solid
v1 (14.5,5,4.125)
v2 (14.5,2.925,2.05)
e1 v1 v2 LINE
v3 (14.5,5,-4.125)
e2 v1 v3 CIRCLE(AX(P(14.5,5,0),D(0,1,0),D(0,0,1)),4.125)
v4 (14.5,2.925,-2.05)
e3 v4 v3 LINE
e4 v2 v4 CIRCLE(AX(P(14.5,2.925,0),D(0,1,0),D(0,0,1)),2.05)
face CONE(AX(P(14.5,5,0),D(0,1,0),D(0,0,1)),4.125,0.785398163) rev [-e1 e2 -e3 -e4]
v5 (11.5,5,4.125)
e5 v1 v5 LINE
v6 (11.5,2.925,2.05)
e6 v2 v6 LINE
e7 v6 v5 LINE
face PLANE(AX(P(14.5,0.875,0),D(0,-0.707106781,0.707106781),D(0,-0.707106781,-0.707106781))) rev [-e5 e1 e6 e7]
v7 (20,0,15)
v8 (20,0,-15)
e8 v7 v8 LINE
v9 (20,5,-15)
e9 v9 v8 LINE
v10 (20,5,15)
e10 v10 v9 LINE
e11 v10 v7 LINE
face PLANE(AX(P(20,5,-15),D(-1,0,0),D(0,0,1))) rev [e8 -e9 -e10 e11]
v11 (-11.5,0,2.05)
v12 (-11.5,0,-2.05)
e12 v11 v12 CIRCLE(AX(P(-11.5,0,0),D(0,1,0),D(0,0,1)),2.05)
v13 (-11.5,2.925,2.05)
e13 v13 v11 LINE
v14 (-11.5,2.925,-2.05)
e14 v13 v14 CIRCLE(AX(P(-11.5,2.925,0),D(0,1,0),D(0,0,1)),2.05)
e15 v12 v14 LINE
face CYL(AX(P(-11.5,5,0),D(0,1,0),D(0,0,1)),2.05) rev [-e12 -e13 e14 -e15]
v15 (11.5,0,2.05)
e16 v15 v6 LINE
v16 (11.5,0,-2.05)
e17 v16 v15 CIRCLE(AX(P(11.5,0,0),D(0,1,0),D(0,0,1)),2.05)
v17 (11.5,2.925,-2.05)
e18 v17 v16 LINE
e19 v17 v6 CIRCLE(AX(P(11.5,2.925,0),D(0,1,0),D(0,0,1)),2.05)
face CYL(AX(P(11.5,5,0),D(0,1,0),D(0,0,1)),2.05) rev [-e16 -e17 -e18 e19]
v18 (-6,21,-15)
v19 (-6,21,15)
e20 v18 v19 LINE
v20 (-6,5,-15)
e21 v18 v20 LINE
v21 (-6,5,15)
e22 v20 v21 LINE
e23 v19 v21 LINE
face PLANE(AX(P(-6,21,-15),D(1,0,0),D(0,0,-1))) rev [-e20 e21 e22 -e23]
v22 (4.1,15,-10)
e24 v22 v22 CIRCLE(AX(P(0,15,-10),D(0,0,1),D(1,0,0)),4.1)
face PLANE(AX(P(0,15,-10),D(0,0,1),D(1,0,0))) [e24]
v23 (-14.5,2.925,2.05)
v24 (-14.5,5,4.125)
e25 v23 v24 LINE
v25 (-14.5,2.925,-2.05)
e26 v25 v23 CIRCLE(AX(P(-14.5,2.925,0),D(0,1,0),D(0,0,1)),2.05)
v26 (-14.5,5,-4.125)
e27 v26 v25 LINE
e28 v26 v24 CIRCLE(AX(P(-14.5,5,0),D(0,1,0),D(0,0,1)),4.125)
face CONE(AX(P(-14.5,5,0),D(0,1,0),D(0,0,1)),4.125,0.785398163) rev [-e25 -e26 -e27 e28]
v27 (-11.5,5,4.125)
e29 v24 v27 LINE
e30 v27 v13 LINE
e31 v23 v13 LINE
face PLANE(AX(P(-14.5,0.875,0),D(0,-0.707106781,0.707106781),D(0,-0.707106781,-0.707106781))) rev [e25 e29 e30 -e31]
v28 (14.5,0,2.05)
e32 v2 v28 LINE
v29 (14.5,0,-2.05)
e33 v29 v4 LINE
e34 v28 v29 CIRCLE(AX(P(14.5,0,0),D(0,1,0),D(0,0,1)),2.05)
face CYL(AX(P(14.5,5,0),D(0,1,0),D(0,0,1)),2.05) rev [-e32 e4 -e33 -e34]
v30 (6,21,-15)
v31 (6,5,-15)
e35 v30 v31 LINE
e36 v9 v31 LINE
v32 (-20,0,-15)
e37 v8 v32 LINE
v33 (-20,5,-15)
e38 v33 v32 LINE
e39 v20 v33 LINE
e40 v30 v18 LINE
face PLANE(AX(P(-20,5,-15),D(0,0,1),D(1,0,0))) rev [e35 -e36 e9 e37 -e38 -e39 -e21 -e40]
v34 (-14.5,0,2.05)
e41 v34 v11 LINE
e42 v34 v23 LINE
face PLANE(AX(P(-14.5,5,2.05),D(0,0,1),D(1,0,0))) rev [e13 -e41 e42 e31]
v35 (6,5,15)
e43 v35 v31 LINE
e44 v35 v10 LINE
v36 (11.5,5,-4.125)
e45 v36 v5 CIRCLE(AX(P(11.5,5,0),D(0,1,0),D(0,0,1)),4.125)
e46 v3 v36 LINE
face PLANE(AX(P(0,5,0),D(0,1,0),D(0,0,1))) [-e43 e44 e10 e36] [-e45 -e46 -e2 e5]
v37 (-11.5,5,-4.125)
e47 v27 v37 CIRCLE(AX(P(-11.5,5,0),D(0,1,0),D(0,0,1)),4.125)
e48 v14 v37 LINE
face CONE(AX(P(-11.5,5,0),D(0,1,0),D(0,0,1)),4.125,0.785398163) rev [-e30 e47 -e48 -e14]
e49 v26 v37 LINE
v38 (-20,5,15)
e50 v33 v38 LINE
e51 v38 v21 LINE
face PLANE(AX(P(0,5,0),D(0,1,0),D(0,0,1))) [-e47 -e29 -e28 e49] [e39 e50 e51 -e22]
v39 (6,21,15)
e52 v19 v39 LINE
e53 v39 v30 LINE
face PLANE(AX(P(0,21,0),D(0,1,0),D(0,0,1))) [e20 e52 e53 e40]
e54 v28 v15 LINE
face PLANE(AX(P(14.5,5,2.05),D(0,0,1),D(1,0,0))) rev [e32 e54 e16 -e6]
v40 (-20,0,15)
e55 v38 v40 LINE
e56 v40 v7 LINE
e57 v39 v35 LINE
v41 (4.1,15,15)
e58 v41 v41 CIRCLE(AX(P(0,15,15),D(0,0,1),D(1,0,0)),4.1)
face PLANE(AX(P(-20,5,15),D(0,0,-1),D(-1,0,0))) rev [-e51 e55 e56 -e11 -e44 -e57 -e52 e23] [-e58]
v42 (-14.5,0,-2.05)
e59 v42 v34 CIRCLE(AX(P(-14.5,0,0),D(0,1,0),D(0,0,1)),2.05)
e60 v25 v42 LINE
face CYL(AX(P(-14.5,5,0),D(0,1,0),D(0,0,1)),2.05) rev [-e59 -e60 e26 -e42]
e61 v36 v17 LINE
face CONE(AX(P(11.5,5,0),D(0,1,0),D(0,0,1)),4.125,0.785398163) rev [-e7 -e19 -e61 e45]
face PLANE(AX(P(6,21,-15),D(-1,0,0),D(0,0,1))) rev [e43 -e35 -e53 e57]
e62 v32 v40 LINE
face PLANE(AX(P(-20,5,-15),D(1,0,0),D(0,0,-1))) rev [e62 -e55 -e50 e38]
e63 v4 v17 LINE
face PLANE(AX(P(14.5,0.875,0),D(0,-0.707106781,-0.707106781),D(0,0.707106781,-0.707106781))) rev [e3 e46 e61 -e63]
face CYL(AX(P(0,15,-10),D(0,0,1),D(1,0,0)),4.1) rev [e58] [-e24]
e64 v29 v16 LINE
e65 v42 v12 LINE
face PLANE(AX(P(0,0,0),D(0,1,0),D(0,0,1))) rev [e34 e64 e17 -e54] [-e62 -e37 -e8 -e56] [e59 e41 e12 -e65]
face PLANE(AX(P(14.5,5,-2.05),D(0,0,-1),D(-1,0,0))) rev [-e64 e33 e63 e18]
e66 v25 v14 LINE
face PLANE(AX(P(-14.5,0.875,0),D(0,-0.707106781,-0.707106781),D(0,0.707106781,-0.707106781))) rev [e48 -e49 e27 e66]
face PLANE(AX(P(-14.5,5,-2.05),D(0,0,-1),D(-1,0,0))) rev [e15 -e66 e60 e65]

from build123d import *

# Parameters (mm, degrees)
SKIZZE1_W                                      = 40
SKIZZE1_H                                      = 30
AUFSATZ_LINEAR_AUSTRAGEN1_DEPTH                = 5
SKIZZE3_W                                      = 12
SKIZZE3_H                                      = 30
AUFSATZ_LINEAR_AUSTRAGEN2_DEPTH                = 16
SKIZZE4_R                                      = 4.1
SCHNITT_LINEAR_AUSTRAGEN1_DEPTH                = 25
FORMSENKUNG_LANGLOCH_F_R_M3_SENKSCHRAUBE_DEPTH = 5


with BuildPart() as part:
    # Skizze1 → Aufsatz-Linear austragen1 (new body)
    with BuildSketch(Plane(origin=(0, 0, 0), x_dir=(1, 0, 0), z_dir=(0, 1, 0))):
        Rectangle(SKIZZE1_W, SKIZZE1_H)
    extrude(amount=AUFSATZ_LINEAR_AUSTRAGEN1_DEPTH)

    # Skizze3 → Aufsatz-Linear austragen2 (add)
    with BuildSketch(Plane(origin=(0, 5, 0), x_dir=(1, 0, 0), z_dir=(0, 1, 0))):
        Rectangle(SKIZZE3_W, SKIZZE3_H)
    extrude(amount=AUFSATZ_LINEAR_AUSTRAGEN2_DEPTH)

    # Skizze4 → Schnitt-Linear austragen1 (cut)
    with BuildSketch(Plane.XY.offset(15)):
        with Locations((0, 15)):
            Circle(SKIZZE4_R)
    extrude(amount=-SCHNITT_LINEAR_AUSTRAGEN1_DEPTH, mode=Mode.SUBTRACT)

    # Formsenkung Langloch für M3 Senkschraube mit Schlitz/Kreuzschlitz1: read off the stored shape, not the designer's step
    # Formsenkung Langloch f_r M3 Senkschr 2 → Formsenkung Langloch für M3 Senkschraube mit Schlitz/Kreuzschlitz1 (cut)
    with BuildSketch(Plane(origin=(0, 0, 0), x_dir=(1, 0, 0), z_dir=(0, 1, 0))):
        with BuildLine():
            Line((-14.5, -2.05), (-11.5, -2.05))
            ThreePointArc((-11.5, -2.05), (-9.45, 0), (-11.5, 2.05))
            Line((-11.5, 2.05), (-14.5, 2.05))
            ThreePointArc((-14.5, 2.05), (-16.55, 0), (-14.5, -2.05))
        make_face()
    formsenkung_langloch_f_r_m3_senkschraube = extrude(amount=FORMSENKUNG_LANGLOCH_F_R_M3_SENKSCHRAUBE_DEPTH, mode=Mode.SUBTRACT)

    # Formsenkung Langloch f_r M3 Senkschr 3: loft between two sections, ruled curve by curve
    formsenkung_langloch_f_r_m3_senkschr_3_from = [
        Edge.make_three_point_arc((-11.5, 2.925, 2.05), (-10.050431099, 2.925, 1.449568901), (-9.45, 2.925, 0)),
        Edge.make_three_point_arc((-9.45, 2.925, 0), (-10.050431099, 2.925, -1.449568901), (-11.5, 2.925, -2.05)),
        Edge.make_three_point_arc((-14.5, 2.925, -2.05), (-15.949568901, 2.925, -1.449568901), (-16.55, 2.925, 0)),
        Edge.make_three_point_arc((-16.55, 2.925, 0), (-15.949568901, 2.925, 1.449568901), (-14.5, 2.925, 2.05)),
        Edge.make_line((-11.5, 2.925, -2.05), (-14.5, 2.925, -2.05)),
        Edge.make_line((-11.5, 2.925, 2.05), (-14.5, 2.925, 2.05)),
    ]
    formsenkung_langloch_f_r_m3_senkschr_3_to = [
        Edge.make_three_point_arc((-11.5, 5, 4.125), (-8.583184528, 5, 2.916815472), (-7.375, 5, 0)),
        Edge.make_three_point_arc((-7.375, 5, 0), (-8.583184528, 5, -2.916815472), (-11.5, 5, -4.125)),
        Edge.make_three_point_arc((-14.5, 5, -4.125), (-17.416815472, 5, -2.916815472), (-18.625, 5, 0)),
        Edge.make_three_point_arc((-18.625, 5, 0), (-17.416815472, 5, 2.916815472), (-14.5, 5, 4.125)),
        Edge.make_line((-11.5, 5, -4.125), (-14.5, 5, -4.125)),
        Edge.make_line((-11.5, 5, 4.125), (-14.5, 5, 4.125)),
    ]
    formsenkung_langloch_f_r_m3_senkschr_3 = Solid(Shell([*[Face.make_surface_from_curves(formsenkung_langloch_f_r_m3_senkschr_3_from[k], formsenkung_langloch_f_r_m3_senkschr_3_to[k]) for k in range(6)], Face(Wire(formsenkung_langloch_f_r_m3_senkschr_3_from)), Face(Wire(formsenkung_langloch_f_r_m3_senkschr_3_to))]))
    add(formsenkung_langloch_f_r_m3_senkschr_3, mode=Mode.SUBTRACT)

    # Spiegeln1: Formsenkung Langloch für M3 Senkschraube mit Schlitz/Kreuzschlitz1, Formsenkung Langloch f_r M3 Senkschr 3 across plane
    add(formsenkung_langloch_f_r_m3_senkschraube.mirror(Plane(origin=(0, 0, 0), x_dir=(0, 0, 1), z_dir=(1, 0, 0))), mode=Mode.SUBTRACT)
    add(formsenkung_langloch_f_r_m3_senkschr_3.mirror(Plane(origin=(0, 0, 0), x_dir=(0, 0, 1), z_dir=(1, 0, 0))), mode=Mode.SUBTRACT)


solid = part.part
